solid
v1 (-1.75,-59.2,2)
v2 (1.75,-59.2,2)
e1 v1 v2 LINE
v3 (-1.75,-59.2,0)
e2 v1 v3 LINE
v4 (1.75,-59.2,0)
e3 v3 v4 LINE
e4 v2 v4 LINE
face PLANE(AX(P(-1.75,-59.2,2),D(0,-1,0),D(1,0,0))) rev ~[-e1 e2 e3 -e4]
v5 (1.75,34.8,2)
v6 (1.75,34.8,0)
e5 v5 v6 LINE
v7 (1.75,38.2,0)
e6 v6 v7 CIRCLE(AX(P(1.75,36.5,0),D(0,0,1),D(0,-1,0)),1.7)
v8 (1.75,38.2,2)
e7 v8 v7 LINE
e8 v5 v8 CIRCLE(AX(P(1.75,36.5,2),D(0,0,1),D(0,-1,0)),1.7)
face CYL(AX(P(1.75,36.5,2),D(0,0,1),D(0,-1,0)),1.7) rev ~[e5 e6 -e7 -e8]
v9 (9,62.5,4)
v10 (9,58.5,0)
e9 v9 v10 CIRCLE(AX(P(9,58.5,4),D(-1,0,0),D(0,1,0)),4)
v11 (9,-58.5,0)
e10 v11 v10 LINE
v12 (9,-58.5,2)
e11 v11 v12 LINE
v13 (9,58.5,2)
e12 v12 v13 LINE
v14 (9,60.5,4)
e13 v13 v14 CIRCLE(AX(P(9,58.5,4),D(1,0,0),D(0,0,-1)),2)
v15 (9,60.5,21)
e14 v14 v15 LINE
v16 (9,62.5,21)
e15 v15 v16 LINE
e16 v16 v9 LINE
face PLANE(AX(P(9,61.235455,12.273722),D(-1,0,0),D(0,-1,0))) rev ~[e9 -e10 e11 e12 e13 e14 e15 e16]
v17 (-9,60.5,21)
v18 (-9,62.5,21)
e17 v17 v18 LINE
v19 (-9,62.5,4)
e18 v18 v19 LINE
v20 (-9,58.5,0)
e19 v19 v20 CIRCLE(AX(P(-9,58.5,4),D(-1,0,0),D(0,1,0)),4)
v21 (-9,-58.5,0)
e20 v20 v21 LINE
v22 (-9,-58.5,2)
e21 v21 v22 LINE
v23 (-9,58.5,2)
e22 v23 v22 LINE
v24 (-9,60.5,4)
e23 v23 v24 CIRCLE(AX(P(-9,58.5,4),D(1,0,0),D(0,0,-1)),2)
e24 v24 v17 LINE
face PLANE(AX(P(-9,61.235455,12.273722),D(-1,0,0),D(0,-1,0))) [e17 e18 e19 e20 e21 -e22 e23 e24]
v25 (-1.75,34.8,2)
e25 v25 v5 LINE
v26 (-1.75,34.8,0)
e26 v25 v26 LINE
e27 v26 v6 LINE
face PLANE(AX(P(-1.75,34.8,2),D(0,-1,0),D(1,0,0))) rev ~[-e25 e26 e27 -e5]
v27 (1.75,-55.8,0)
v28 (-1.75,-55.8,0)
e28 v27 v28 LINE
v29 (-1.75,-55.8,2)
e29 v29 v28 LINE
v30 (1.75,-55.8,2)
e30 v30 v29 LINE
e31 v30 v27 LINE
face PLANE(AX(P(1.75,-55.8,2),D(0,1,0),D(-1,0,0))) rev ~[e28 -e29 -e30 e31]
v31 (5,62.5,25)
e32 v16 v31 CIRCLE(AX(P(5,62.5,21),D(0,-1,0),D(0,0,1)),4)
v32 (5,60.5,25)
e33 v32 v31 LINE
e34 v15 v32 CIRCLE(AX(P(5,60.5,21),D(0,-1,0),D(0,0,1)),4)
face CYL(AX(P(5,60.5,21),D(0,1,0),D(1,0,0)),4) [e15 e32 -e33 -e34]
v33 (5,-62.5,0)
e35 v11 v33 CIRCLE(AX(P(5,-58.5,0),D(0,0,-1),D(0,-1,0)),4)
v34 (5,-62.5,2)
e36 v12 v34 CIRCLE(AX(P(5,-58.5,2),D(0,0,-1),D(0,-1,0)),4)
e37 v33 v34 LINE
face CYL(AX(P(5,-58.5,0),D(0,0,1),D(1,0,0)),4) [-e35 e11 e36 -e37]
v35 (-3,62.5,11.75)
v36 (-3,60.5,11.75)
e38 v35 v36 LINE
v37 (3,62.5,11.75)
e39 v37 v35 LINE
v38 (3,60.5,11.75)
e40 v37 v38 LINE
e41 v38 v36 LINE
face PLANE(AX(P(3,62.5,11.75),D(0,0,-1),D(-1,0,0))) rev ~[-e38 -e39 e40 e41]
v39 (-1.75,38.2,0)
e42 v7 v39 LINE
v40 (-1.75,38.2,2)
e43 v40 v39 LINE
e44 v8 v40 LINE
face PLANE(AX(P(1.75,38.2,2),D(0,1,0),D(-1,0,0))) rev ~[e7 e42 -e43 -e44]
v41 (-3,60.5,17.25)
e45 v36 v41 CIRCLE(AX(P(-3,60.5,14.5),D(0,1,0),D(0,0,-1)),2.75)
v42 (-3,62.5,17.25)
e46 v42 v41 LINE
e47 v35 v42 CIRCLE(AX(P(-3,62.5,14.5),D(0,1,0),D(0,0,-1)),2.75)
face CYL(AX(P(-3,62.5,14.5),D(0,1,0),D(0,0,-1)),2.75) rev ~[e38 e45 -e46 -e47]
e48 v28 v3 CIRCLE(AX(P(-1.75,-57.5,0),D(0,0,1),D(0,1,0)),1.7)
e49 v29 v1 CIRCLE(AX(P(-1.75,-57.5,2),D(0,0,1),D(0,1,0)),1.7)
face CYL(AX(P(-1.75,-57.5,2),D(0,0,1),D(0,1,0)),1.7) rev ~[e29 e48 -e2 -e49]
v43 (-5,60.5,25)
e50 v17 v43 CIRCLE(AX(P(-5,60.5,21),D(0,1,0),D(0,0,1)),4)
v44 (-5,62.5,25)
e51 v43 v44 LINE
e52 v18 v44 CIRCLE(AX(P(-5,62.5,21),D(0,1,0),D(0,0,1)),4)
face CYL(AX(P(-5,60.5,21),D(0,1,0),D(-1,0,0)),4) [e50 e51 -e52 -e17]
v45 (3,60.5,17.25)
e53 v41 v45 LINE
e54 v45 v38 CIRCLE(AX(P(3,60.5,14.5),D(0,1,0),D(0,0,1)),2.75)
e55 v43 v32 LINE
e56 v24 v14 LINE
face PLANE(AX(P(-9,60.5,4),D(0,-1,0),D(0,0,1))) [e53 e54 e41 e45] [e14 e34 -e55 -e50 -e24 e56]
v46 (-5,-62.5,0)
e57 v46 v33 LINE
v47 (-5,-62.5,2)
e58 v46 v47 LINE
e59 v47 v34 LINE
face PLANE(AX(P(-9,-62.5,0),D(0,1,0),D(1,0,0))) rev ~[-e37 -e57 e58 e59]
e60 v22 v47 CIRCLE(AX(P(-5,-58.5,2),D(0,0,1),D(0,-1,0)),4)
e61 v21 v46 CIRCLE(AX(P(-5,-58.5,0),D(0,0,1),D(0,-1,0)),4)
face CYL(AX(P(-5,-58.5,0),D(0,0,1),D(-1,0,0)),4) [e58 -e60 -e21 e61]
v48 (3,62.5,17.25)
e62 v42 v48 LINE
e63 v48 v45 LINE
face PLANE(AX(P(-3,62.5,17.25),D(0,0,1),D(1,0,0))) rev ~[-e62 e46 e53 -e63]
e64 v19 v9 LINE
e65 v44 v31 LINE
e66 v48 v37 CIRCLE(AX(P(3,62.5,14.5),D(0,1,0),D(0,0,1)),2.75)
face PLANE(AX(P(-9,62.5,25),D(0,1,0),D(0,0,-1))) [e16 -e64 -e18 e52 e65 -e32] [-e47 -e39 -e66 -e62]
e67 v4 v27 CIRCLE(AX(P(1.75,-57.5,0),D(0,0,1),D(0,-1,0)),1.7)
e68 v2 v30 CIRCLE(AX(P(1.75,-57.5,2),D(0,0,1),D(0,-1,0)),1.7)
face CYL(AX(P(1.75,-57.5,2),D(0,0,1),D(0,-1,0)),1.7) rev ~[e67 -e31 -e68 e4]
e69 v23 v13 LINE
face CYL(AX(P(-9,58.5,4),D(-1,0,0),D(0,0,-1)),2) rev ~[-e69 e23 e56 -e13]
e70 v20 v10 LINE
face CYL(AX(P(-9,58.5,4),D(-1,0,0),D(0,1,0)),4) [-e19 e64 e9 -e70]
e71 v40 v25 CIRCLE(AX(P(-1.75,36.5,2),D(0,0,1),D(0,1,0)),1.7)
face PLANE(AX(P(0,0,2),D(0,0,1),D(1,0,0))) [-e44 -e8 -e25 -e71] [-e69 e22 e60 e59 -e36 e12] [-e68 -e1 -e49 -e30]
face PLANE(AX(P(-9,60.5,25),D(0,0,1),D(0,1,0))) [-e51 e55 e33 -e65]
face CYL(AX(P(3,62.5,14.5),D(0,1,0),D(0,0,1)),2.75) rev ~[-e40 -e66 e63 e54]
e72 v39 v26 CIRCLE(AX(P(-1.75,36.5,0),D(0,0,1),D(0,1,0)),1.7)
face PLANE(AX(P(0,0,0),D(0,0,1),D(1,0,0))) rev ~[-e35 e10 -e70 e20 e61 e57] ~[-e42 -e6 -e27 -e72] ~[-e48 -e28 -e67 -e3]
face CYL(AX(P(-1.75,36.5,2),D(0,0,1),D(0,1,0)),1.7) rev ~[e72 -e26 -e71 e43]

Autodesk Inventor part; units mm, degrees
ref_plane "YZ Plane" through (0, 0, 0) normal (1, 0, 0) x (0, 1, 0)
ref_plane "XZ Plane" through (0, 0, 0) normal (0, 1, 0) x (-1, 0, 0)
ref_plane "XY Plane" through (0, 0, 0) normal (0, 0, 1) x (1, 0, 0)
sketch "Sketch1" plane through (0, 0, 0) normal (0, 0, 1) x (1, 0, 0)
  line L0 (-9, -62.5) -> (9, -62.5)
  line L1 (9, -62.5) -> (9, 62.5)
  line L2 (9, 62.5) -> (-9, 62.5)
  line L3 (-9, 62.5) -> (-9, -62.5)
  line L4 (-9, -62.5) -> (9, 62.5) construction
  line L5 (9, -62.5) -> (-9, 62.5) construction
  point P0 (0, 0)
  dimension "d0" = 18
  dimension "d1" = 125
extrude "Plate1" add sketch "Sketch1" along normal blind 2
sketch "Sketch2" plane through (-9, 60.5, 0) normal (0, 1, 0) x (-1, 0, 0)
  line L0 (-18, 0) -> (0, 0)
  line L1 (0, 0) -> (0, 25)
  line L2 (0, 25) -> (-18, 25)
  line L3 (-18, 25) -> (-18, 0)
edge flange "Flange1" height 25 angle 90 thickness 2 bend radius 2 thickness toward (0, 1, 0) relief tear relief width 2 relief depth 1 edges at (0, 62.5, 2) wall of the first edge with corners at (9, 60.5, 0) (-9, 60.5, 0) (-9, 60.5, 25) (9, 60.5, 25)
bend "Bend1"
corner "Corner1"
sketch "Sketch3" plane through (0, 0, 2) normal (0, 0, 1) x (1, 0, 0)
  line L0 (-1.75, -57.5) -> (1.75, -57.5) construction
  line L1 (-1.75, -59.2) -> (1.75, -59.2)
  line L2 (1.75, -55.8) -> (-1.75, -55.8)
  arc A0 (-1.75, -55.8) -> (-1.75, -59.2) centre (-1.75, -57.5) ccw
  arc A1 (1.75, -59.2) -> (1.75, -55.8) centre (1.75, -57.5) ccw
  line L3 (-1.75, 36.5) -> (1.75, 36.5) construction
  line L4 (-9, -62.5) -> (-9, 58.5) projected
  line L5 (-1.75, 34.8) -> (1.75, 34.8)
  line L6 (1.75, 38.2) -> (-1.75, 38.2)
  arc A2 (-1.75, 38.2) -> (-1.75, 34.8) centre (-1.75, 36.5) ccw
  arc A3 (1.75, 34.8) -> (1.75, 38.2) centre (1.75, 36.5) ccw
  line L7 (9, -62.5) -> (-9, -62.5) projected
  point P0 (0, 0)
  point P1 (0, -57.5)
  point P2 (0, 36.5)
  dimension "d13" = 94
  dimension "d14" = 5
  dimension "d15" = 3.4
  dimension "d16" = 3.5
extrude "Cut1" cut sketch "Sketch3" against normal blind 2
sketch "Sketch4" plane through (-9, 62.5, 25) normal (0, 1, 0) x (1, 0, 0)
  line L0 (12, 10.5) -> (6, 10.5) construction
  line L1 (12, 13.25) -> (6, 13.25)
  line L2 (6, 7.75) -> (12, 7.75)
  arc A0 (12, 7.75) -> (12, 13.25) centre (12, 10.5) ccw
  arc A1 (6, 13.25) -> (6, 7.75) centre (6, 10.5) ccw
  line L3 (18, 21) -> (18, 0) projected
  point P0 (9, 25)
  point P1 (9, 10.5)
  point P2 (18, 10.5)
  dimension "d19" = 5.5
  dimension "d20" = 6
extrude "Cut2" cut sketch "Sketch4" against normal blind 2
fillet "Fillet1" radius 4 4 edges at (-9, 61.5, 25) (9, 61.5, 25) (-9, -62.5, 1) (9, -62.5, 1)
equation "\"d17\" = Thickness"
equation "\"d21\" = Thickness"
equation "\"d2\" = Thickness"
equation "\"d3\" = BendReliefWidth"
equation "\"d4\" = BendReliefDepth"
equation "\"d5\" = MinimumRemnant"
equation "\"d6\" = TransitionRadius"
equation "\"d9\" = BendRadius"
equation "\"d10\" = CornerReliefSize"
equation "\"d11\" = GapSize"
equation "\"d12\" = JacobiRadiusSize"
equation "\"BendRadius\" = Thickness"
equation "\"BendReliefWidth\" = Thickness"
equation "\"BendReliefDepth\" = 0.5 * Thickness"
equation "\"CornerReliefSize\" = 4 * Thickness"
equation "\"MinimumRemnant\" = 2 * Thickness"
equation "\"TransitionRadius\" = BendRadius"
equation "\"JacobiRadiusSize\" = BendRadius"
equation "\"GapSize\" = Thickness"
equation "\"Thickness\" = 2"
properties part number "BREEZE-M30"
